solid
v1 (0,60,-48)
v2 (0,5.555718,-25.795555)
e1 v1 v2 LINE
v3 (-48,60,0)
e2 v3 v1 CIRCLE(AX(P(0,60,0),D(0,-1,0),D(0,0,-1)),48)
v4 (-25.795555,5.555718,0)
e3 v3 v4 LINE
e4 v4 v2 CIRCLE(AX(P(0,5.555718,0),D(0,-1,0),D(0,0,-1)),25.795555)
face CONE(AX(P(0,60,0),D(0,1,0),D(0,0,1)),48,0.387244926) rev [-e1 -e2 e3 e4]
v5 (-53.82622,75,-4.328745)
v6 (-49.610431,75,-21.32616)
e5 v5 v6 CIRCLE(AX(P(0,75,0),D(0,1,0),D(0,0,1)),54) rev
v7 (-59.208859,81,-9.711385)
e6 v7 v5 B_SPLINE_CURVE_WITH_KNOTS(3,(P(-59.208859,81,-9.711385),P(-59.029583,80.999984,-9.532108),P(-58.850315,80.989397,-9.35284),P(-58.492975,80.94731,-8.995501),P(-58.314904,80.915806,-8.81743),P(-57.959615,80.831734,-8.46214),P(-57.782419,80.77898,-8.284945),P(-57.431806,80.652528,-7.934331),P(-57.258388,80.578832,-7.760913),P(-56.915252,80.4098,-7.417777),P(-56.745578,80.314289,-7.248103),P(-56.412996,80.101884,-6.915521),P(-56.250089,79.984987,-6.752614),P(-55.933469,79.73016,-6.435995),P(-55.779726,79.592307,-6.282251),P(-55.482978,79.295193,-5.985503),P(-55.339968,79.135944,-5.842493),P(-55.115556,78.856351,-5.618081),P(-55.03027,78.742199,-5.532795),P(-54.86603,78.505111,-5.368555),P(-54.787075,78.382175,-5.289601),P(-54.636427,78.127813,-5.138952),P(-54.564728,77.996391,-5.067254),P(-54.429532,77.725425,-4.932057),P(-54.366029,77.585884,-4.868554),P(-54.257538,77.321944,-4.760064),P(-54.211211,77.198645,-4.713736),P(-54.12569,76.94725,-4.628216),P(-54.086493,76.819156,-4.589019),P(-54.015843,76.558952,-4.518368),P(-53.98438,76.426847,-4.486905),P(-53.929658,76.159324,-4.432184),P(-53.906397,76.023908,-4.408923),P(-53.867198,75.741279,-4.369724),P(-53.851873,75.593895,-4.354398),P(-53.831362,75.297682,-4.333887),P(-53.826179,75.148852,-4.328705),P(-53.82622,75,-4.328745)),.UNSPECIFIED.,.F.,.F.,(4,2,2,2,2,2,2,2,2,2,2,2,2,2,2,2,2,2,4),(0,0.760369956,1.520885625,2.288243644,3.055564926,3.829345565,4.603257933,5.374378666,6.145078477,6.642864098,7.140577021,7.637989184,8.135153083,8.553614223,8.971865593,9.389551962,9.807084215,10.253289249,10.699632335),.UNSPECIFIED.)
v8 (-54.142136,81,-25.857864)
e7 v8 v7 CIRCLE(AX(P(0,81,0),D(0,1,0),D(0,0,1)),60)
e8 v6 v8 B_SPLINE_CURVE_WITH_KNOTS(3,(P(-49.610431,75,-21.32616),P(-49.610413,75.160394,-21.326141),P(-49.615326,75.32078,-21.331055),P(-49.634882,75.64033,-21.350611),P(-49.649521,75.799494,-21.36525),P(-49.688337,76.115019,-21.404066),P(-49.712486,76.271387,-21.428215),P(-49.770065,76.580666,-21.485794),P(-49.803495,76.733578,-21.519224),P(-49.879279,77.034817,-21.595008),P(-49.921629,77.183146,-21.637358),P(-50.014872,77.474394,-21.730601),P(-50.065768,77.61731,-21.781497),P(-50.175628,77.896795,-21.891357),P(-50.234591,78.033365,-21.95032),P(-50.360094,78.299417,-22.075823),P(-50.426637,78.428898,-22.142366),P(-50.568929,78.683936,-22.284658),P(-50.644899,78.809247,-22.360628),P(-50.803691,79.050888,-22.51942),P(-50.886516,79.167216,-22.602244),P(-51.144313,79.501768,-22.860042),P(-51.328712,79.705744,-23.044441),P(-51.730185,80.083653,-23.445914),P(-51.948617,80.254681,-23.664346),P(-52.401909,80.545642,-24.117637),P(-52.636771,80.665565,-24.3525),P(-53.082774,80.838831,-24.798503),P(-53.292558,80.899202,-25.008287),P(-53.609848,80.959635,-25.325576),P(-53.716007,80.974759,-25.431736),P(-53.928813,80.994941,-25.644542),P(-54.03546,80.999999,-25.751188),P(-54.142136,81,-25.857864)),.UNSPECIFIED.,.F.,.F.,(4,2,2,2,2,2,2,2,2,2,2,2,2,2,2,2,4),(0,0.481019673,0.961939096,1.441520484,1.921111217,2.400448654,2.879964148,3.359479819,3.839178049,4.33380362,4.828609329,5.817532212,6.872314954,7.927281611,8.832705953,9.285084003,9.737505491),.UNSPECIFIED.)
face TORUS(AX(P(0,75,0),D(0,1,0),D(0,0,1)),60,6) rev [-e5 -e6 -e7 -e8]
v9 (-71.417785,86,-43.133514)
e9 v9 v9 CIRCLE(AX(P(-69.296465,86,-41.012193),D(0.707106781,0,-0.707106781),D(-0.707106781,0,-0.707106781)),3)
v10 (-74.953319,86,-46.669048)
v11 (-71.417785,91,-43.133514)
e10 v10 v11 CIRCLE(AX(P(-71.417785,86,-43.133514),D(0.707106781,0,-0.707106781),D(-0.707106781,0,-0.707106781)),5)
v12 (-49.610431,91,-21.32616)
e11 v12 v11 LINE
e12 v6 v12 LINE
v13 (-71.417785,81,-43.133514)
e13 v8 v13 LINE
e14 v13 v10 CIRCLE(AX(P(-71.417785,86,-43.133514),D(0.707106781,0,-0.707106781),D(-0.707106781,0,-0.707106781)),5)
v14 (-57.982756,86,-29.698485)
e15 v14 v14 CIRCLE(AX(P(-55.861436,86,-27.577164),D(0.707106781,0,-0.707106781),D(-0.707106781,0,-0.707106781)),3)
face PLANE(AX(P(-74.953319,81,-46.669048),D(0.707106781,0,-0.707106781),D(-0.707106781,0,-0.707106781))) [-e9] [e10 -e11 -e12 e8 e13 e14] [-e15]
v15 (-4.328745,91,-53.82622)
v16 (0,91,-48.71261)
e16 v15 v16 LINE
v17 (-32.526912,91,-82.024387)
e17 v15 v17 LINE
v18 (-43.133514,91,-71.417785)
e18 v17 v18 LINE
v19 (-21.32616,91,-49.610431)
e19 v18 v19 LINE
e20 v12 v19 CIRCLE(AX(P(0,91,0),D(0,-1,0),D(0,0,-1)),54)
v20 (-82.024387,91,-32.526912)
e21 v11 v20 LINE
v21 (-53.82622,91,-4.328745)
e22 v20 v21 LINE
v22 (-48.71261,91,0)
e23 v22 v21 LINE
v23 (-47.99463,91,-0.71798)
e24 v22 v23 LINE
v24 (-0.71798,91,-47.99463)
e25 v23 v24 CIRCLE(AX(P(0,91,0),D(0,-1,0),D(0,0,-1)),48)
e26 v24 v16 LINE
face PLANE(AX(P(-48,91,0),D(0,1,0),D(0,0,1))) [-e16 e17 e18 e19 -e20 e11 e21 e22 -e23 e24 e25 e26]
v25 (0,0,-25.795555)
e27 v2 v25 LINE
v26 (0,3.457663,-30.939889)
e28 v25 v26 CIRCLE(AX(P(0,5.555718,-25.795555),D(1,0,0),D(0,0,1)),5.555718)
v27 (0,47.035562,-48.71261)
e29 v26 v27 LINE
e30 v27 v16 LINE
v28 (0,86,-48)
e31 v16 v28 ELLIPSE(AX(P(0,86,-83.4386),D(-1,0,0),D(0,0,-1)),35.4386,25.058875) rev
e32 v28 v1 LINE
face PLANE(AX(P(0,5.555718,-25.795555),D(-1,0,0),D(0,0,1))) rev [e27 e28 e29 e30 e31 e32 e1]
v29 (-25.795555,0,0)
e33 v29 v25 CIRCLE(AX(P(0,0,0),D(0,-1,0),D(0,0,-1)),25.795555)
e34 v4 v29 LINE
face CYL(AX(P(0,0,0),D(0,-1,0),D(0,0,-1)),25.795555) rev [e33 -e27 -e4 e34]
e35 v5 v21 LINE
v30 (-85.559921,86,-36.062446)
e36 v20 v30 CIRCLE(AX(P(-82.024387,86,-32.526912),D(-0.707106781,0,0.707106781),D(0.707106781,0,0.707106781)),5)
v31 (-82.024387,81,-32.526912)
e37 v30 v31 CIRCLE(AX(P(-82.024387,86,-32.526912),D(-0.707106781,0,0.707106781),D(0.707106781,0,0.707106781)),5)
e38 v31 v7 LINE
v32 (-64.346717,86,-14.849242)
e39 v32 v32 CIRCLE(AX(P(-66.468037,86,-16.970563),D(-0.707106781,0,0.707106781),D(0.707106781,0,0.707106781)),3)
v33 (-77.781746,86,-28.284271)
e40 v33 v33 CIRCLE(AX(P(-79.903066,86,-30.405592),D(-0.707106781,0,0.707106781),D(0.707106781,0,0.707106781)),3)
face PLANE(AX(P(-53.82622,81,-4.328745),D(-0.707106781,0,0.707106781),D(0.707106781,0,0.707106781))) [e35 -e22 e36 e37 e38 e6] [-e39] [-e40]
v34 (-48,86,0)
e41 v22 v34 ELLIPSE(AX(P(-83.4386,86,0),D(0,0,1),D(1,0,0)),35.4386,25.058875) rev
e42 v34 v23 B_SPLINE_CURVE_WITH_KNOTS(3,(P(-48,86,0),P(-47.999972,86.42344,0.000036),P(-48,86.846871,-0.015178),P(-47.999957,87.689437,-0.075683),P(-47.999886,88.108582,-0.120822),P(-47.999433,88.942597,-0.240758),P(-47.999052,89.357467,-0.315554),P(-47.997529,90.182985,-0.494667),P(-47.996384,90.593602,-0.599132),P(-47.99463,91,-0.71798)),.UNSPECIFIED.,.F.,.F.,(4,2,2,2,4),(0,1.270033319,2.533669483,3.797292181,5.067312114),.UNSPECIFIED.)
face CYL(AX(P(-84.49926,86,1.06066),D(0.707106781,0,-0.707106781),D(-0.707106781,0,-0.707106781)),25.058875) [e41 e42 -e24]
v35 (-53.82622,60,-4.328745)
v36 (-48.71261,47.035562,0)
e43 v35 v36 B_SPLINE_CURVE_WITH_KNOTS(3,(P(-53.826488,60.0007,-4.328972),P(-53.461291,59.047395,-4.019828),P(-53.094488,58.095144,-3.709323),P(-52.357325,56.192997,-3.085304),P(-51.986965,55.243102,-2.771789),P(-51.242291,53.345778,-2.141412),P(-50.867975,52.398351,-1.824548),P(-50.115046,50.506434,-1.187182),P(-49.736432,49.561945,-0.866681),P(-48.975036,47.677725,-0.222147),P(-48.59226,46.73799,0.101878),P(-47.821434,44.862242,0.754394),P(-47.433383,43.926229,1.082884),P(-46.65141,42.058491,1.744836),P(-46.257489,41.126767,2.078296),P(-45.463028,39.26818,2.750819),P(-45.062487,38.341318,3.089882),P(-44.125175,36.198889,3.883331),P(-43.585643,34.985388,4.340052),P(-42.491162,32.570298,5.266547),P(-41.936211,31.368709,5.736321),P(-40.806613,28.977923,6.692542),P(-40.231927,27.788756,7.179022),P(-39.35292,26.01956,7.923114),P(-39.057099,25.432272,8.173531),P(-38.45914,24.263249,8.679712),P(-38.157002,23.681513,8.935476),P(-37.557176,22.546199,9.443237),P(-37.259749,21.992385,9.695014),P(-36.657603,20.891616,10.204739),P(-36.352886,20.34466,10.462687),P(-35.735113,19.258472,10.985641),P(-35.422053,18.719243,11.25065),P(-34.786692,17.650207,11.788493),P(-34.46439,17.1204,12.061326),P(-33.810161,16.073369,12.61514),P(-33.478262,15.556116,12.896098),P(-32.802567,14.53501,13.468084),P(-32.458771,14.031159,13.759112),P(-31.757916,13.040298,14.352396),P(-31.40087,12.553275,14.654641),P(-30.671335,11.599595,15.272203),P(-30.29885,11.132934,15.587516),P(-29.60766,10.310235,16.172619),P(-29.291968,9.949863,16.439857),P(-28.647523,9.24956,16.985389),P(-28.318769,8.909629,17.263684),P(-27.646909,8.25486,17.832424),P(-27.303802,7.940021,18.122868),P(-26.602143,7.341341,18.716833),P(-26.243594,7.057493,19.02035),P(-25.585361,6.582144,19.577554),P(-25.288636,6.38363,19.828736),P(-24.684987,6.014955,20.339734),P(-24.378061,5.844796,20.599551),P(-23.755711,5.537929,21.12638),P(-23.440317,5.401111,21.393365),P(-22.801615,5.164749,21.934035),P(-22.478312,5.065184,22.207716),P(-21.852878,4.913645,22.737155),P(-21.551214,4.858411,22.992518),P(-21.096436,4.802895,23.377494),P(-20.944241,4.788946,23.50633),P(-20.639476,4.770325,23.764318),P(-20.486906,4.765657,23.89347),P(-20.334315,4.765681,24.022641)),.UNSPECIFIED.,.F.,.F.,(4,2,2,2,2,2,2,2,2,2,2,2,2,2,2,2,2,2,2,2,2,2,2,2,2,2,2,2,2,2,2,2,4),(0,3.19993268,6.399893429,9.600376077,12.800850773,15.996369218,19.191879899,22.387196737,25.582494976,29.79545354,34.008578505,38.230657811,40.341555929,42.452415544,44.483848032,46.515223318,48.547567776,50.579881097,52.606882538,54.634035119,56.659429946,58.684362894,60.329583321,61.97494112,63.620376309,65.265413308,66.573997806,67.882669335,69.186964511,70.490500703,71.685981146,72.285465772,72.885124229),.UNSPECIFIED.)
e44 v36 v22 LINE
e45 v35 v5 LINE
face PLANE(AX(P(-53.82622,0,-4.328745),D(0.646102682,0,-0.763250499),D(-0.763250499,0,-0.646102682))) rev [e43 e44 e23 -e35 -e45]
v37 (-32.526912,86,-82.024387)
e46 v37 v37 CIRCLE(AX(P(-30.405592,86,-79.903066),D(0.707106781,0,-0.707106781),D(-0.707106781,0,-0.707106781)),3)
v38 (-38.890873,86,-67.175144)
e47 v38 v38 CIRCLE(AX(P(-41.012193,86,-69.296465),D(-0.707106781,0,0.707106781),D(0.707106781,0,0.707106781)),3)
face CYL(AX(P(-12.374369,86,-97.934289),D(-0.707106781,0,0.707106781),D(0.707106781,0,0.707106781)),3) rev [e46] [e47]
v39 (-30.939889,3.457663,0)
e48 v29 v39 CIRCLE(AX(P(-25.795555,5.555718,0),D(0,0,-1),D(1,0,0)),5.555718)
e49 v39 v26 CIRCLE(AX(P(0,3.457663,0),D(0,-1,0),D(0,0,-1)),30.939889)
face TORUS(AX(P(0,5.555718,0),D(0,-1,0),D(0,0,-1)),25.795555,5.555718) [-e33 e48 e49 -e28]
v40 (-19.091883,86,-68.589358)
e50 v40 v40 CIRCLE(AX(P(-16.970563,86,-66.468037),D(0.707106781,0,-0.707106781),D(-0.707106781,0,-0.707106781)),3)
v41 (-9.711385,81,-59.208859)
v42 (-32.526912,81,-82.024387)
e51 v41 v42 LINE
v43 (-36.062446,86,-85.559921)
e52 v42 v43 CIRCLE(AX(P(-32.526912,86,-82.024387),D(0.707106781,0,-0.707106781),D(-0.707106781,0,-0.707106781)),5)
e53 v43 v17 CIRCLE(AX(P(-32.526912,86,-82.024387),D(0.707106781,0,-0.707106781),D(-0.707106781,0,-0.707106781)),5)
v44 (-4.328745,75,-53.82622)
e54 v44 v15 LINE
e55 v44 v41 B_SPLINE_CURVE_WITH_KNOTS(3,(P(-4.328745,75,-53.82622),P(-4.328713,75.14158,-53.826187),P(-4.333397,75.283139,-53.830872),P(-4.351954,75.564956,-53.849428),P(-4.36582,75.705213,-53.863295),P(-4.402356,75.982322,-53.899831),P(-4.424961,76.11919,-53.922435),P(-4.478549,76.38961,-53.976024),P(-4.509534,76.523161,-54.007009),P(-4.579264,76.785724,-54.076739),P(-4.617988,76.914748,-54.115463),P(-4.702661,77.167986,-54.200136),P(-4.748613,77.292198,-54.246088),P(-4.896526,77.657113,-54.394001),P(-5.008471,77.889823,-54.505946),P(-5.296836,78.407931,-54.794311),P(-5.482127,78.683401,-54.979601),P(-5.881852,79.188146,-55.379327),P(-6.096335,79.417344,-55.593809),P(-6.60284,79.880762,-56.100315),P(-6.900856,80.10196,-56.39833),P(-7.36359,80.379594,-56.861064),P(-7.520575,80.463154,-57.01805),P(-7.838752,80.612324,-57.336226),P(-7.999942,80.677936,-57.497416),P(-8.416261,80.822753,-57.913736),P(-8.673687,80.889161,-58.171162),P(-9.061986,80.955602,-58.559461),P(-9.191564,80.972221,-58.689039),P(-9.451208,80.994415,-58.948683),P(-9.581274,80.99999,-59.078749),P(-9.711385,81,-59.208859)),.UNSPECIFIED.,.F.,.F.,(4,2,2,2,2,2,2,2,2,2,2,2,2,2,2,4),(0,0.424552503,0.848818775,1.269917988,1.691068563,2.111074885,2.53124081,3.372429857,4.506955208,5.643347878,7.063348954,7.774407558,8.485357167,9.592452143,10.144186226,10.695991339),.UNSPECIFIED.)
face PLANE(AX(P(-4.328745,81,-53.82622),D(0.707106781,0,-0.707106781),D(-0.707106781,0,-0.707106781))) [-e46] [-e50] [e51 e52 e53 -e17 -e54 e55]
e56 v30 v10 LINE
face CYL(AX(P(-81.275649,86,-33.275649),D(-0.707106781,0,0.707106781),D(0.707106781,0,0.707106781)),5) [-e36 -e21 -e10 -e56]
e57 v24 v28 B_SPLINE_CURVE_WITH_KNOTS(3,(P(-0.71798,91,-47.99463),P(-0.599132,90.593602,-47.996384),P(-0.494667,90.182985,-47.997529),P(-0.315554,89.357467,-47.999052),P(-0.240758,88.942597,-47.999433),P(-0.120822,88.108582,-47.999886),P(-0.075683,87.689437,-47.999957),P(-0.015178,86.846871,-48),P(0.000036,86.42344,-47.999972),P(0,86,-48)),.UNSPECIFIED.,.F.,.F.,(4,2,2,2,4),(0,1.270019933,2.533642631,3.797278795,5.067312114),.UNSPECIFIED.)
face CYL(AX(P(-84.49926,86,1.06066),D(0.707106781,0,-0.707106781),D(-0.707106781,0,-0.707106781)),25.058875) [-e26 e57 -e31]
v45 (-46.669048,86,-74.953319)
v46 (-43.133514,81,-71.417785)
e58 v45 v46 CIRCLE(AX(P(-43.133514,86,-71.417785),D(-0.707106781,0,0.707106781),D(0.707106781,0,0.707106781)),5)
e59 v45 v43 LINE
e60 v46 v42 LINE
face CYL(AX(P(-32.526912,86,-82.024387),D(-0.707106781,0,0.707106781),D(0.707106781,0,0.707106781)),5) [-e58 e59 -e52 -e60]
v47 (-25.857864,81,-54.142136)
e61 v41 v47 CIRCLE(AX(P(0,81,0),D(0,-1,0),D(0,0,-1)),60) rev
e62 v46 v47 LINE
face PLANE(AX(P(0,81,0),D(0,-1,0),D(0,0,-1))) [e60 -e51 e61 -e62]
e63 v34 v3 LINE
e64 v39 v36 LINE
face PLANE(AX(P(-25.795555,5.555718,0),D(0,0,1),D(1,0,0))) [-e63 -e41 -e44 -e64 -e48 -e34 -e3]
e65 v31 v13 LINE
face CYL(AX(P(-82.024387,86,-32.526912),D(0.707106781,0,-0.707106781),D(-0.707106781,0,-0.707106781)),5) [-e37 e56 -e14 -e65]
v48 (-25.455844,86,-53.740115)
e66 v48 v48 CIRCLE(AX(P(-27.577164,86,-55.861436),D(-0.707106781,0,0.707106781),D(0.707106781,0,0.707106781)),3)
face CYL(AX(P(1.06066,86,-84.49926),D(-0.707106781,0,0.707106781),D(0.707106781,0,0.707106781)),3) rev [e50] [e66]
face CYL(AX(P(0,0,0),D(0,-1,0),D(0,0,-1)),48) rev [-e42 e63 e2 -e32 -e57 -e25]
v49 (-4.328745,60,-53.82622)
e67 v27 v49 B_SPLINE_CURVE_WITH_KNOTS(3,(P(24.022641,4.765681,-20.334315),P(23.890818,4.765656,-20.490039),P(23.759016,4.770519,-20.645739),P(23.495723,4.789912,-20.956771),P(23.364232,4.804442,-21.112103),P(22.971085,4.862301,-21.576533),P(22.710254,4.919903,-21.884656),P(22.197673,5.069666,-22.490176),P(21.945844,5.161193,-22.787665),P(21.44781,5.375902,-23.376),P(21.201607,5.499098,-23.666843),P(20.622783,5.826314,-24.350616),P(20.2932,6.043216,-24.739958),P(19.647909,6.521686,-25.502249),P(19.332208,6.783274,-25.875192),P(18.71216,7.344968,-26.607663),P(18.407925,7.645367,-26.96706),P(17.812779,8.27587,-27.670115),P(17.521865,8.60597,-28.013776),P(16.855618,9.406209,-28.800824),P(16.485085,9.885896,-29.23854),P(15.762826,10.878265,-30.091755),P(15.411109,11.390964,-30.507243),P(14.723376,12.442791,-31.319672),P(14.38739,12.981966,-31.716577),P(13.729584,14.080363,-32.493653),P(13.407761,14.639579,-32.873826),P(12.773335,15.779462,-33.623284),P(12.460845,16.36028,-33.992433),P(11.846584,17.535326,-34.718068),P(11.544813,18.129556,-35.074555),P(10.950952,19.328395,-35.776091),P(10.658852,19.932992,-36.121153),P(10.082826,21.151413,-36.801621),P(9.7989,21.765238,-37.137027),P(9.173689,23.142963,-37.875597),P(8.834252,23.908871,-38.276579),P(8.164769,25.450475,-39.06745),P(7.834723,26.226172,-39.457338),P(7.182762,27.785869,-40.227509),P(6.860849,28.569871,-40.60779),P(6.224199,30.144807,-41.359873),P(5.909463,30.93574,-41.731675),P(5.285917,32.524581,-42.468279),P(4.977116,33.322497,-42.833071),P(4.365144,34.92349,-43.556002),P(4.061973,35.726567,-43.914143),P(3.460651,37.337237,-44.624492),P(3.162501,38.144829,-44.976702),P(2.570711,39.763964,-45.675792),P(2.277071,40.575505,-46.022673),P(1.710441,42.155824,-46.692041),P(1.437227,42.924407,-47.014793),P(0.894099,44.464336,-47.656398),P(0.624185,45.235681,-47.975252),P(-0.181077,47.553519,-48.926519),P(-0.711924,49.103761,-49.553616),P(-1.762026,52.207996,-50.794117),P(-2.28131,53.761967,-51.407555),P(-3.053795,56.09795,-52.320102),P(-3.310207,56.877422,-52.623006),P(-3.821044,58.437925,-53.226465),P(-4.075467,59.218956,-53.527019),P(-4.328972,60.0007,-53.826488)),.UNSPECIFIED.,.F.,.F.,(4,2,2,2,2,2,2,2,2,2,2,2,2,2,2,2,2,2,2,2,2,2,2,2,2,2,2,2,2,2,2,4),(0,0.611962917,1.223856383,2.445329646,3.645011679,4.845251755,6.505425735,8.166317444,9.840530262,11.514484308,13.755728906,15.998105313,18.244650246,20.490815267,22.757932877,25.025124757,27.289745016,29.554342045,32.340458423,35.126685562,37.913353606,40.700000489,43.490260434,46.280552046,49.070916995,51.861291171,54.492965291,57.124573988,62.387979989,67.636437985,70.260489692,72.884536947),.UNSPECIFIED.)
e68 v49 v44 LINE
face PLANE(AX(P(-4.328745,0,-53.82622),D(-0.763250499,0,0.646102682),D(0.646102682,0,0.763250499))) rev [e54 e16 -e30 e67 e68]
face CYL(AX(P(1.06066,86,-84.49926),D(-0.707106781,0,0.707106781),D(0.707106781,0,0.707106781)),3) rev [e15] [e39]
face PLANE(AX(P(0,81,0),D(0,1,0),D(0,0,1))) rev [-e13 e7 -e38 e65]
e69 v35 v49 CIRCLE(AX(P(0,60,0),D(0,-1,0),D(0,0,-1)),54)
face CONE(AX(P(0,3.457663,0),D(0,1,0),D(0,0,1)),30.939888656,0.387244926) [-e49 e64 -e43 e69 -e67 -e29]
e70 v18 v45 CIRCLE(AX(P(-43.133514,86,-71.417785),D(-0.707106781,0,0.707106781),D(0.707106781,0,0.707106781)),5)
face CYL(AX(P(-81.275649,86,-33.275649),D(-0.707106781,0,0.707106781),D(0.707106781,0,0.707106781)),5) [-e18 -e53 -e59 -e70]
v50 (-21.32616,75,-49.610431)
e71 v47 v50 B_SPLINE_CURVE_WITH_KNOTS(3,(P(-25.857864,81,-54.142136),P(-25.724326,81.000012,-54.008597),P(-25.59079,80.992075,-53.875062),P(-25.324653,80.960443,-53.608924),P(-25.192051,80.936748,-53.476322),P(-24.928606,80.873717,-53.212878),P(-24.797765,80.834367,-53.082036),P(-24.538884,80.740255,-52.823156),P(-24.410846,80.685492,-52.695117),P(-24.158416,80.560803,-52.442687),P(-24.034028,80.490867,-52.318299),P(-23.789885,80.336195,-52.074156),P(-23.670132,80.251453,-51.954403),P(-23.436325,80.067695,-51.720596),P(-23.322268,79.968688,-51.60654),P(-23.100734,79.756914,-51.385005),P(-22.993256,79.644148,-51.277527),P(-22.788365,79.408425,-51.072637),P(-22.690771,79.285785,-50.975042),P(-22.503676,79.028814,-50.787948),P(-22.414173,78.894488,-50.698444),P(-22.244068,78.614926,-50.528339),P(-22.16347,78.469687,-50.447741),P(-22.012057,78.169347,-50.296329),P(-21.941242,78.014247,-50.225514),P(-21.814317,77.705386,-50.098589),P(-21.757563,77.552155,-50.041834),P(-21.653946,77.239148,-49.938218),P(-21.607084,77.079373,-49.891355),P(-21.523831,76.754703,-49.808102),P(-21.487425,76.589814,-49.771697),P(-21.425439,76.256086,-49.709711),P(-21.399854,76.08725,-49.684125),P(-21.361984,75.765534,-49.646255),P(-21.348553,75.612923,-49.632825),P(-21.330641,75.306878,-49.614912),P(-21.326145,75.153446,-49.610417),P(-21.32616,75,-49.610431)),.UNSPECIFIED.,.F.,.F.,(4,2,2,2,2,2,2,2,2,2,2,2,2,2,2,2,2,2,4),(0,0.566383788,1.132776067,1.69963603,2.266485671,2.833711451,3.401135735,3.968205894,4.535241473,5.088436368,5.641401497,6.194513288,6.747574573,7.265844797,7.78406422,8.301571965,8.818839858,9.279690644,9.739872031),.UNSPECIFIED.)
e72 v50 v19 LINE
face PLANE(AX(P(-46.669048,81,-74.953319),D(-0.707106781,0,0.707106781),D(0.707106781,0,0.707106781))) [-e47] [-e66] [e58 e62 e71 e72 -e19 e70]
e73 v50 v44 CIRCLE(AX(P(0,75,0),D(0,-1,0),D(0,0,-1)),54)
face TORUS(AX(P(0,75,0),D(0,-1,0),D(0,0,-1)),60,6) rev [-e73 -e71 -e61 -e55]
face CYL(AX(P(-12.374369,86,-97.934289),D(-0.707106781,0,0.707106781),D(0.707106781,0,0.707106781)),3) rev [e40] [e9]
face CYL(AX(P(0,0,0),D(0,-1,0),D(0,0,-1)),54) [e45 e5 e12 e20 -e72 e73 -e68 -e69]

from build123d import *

# Parameters (mm, degrees)
REVOLUCI_N1_ANGLE       = 90
SALIENTE_EXTRUIR1_START = -10
SALIENTE_EXTRUIR1_DEPTH = 10
REDONDEO1_R             = 6
CROQUIS5_R              = 3
CORTAR_EXTRUIR1_DEPTH   = 156.393050206
REDONDEO2_R             = 5
CORTAR_EXTRUIR3_DEPTH   = 157.140962122
CORTAR_EXTRUIR4_DEPTH   = 152.400132213


with BuildPart() as part:
    # Croquis3 → Revolución1 (revolve)
    with BuildSketch(Plane(origin=(0, 0, 0), x_dir=(0, 0, -1), z_dir=(1, 0, 0))):
        with BuildLine():
            Line((25.795554958, 0), (25.795554958, 5.555717972))
            Line((25.795554958, 5.555717972), (48, 60))
            Line((48, 60), (48, 91))
            Line((48, 91), (54, 91))
            Line((54, 91), (54, 60))
            Line((54, 60), (30.939888656, 3.457663399))
            ThreePointArc((30.939888656, 3.457663399), (28.894732485, 0.944741845), (25.795554958, 0))
        make_face()
    revolve(axis=Axis((0, 0, 0), (0, 1, 0)), revolution_arc=REVOLUCI_N1_ANGLE)

    # Croquis4 → Saliente-Extruir1 (add)
    with BuildSketch(Plane(origin=(0, 91, 0), x_dir=(1, 0, 0), z_dir=(0, 1, 0)).offset(SALIENTE_EXTRUIR1_START)):
        with BuildLine():
            Line((-85.559920524, 36.062445841), (-74.953318806, 46.669047558))
            Line((-74.953318806, 46.669047558), (-49.610431326, 21.326160078))
            ThreePointArc((-49.610431326, 21.326160078), (-52.411957015, 12.999490829), (-53.826220039, 4.328745356))
            Line((-53.826220039, 4.328745356), (-85.559920524, 36.062445841))
        make_face()
        with BuildLine():
            Line((-46.669047558, 74.953318806), (-21.326160078, 49.610431326))
            ThreePointArc((-21.326160078, 49.610431326), (-12.999490829, 52.411957015), (-4.328745356, 53.826220039))
            Line((-4.328745356, 53.826220039), (-36.062445841, 85.559920524))
            Line((-36.062445841, 85.559920524), (-46.669047558, 74.953318806))
        make_face()
    extrude(amount=SALIENTE_EXTRUIR1_DEPTH)

    # Redondeo1
    redondeo1_edges = [part.edges().sort_by_distance(p)[0] for p in [
        (-52.411957015, 81, -12.999490829),
        (-12.999490829, 81, -52.411957015),
    ]]
    fillet(redondeo1_edges, radius=REDONDEO1_R)

    # Croquis5 → Cortar-Extruir1 (cut, through all)
    with BuildSketch(Plane(origin=(-24.748737342, 0, 24.748737342), x_dir=(0.707106781186549, 0, 0.707106781186546), z_dir=(-0.707106781186546, 0, 0.707106781186549))):
        with Locations((-59, 86)):
            Circle(CROQUIS5_R)
        with Locations((-78, 86)):
            Circle(CROQUIS5_R)
    extrude(amount=-CORTAR_EXTRUIR1_DEPTH, mode=Mode.SUBTRACT)

    # Redondeo2
    redondeo2_edges = [part.edges().sort_by_distance(p)[0] for p in [
        (-80.256619665, 81, -41.365746699),
        (-41.365746699, 81, -80.256619665),
        (-80.256619665, 91, -41.365746699),
        (-41.365746699, 91, -80.256619665),
    ]]
    fillet(redondeo2_edges, radius=REDONDEO2_R - 0.0001)  # a hair under: the kernel refuses the full size

    # Croquis14 → Cortar-Extruir3 (cut, through all)
    with BuildSketch(Plane(origin=(27, 0, -27), x_dir=(-0.7071067811865492, 0, -0.7071067811865458), z_dir=(0.7071067811865458, 0, -0.7071067811865492))):
        with BuildLine():
            Line((34.445016975, 91), (33.941125497, 91))
            Line((33.941125497, 91), (33.941125497, 86))
            ThreePointArc((33.941125497, 86), (34.067416606, 88.512663259), (34.445016975, 91))
        make_face()
    extrude(amount=-CORTAR_EXTRUIR3_DEPTH, mode=Mode.SUBTRACT)

    # Croquis17 → Cortar-Extruir4 (cut, through all)
    with BuildSketch(Plane(origin=(0, 91, 0), x_dir=(1, 0, 0), z_dir=(0, 1, 0))):
        with BuildLine():
            Line((-4.328745356, 53.826220039), (0, 48.712610162))
            Line((0, 48.712610162), (0, 54))
            ThreePointArc((0, 54), (-2.1661161, 53.956537519), (-4.328745356, 53.826220039))
        make_face()
        with BuildLine():
            Line((-53.826220039, 4.328745356), (-48.712610162, 0))
            Line((-48.712610162, 0), (-54, 0))
            ThreePointArc((-54, 0), (-53.956537519, 2.1661161), (-53.826220039, 4.328745356))
        make_face()
    extrude(amount=-CORTAR_EXTRUIR4_DEPTH, mode=Mode.SUBTRACT)


solid = part.part
